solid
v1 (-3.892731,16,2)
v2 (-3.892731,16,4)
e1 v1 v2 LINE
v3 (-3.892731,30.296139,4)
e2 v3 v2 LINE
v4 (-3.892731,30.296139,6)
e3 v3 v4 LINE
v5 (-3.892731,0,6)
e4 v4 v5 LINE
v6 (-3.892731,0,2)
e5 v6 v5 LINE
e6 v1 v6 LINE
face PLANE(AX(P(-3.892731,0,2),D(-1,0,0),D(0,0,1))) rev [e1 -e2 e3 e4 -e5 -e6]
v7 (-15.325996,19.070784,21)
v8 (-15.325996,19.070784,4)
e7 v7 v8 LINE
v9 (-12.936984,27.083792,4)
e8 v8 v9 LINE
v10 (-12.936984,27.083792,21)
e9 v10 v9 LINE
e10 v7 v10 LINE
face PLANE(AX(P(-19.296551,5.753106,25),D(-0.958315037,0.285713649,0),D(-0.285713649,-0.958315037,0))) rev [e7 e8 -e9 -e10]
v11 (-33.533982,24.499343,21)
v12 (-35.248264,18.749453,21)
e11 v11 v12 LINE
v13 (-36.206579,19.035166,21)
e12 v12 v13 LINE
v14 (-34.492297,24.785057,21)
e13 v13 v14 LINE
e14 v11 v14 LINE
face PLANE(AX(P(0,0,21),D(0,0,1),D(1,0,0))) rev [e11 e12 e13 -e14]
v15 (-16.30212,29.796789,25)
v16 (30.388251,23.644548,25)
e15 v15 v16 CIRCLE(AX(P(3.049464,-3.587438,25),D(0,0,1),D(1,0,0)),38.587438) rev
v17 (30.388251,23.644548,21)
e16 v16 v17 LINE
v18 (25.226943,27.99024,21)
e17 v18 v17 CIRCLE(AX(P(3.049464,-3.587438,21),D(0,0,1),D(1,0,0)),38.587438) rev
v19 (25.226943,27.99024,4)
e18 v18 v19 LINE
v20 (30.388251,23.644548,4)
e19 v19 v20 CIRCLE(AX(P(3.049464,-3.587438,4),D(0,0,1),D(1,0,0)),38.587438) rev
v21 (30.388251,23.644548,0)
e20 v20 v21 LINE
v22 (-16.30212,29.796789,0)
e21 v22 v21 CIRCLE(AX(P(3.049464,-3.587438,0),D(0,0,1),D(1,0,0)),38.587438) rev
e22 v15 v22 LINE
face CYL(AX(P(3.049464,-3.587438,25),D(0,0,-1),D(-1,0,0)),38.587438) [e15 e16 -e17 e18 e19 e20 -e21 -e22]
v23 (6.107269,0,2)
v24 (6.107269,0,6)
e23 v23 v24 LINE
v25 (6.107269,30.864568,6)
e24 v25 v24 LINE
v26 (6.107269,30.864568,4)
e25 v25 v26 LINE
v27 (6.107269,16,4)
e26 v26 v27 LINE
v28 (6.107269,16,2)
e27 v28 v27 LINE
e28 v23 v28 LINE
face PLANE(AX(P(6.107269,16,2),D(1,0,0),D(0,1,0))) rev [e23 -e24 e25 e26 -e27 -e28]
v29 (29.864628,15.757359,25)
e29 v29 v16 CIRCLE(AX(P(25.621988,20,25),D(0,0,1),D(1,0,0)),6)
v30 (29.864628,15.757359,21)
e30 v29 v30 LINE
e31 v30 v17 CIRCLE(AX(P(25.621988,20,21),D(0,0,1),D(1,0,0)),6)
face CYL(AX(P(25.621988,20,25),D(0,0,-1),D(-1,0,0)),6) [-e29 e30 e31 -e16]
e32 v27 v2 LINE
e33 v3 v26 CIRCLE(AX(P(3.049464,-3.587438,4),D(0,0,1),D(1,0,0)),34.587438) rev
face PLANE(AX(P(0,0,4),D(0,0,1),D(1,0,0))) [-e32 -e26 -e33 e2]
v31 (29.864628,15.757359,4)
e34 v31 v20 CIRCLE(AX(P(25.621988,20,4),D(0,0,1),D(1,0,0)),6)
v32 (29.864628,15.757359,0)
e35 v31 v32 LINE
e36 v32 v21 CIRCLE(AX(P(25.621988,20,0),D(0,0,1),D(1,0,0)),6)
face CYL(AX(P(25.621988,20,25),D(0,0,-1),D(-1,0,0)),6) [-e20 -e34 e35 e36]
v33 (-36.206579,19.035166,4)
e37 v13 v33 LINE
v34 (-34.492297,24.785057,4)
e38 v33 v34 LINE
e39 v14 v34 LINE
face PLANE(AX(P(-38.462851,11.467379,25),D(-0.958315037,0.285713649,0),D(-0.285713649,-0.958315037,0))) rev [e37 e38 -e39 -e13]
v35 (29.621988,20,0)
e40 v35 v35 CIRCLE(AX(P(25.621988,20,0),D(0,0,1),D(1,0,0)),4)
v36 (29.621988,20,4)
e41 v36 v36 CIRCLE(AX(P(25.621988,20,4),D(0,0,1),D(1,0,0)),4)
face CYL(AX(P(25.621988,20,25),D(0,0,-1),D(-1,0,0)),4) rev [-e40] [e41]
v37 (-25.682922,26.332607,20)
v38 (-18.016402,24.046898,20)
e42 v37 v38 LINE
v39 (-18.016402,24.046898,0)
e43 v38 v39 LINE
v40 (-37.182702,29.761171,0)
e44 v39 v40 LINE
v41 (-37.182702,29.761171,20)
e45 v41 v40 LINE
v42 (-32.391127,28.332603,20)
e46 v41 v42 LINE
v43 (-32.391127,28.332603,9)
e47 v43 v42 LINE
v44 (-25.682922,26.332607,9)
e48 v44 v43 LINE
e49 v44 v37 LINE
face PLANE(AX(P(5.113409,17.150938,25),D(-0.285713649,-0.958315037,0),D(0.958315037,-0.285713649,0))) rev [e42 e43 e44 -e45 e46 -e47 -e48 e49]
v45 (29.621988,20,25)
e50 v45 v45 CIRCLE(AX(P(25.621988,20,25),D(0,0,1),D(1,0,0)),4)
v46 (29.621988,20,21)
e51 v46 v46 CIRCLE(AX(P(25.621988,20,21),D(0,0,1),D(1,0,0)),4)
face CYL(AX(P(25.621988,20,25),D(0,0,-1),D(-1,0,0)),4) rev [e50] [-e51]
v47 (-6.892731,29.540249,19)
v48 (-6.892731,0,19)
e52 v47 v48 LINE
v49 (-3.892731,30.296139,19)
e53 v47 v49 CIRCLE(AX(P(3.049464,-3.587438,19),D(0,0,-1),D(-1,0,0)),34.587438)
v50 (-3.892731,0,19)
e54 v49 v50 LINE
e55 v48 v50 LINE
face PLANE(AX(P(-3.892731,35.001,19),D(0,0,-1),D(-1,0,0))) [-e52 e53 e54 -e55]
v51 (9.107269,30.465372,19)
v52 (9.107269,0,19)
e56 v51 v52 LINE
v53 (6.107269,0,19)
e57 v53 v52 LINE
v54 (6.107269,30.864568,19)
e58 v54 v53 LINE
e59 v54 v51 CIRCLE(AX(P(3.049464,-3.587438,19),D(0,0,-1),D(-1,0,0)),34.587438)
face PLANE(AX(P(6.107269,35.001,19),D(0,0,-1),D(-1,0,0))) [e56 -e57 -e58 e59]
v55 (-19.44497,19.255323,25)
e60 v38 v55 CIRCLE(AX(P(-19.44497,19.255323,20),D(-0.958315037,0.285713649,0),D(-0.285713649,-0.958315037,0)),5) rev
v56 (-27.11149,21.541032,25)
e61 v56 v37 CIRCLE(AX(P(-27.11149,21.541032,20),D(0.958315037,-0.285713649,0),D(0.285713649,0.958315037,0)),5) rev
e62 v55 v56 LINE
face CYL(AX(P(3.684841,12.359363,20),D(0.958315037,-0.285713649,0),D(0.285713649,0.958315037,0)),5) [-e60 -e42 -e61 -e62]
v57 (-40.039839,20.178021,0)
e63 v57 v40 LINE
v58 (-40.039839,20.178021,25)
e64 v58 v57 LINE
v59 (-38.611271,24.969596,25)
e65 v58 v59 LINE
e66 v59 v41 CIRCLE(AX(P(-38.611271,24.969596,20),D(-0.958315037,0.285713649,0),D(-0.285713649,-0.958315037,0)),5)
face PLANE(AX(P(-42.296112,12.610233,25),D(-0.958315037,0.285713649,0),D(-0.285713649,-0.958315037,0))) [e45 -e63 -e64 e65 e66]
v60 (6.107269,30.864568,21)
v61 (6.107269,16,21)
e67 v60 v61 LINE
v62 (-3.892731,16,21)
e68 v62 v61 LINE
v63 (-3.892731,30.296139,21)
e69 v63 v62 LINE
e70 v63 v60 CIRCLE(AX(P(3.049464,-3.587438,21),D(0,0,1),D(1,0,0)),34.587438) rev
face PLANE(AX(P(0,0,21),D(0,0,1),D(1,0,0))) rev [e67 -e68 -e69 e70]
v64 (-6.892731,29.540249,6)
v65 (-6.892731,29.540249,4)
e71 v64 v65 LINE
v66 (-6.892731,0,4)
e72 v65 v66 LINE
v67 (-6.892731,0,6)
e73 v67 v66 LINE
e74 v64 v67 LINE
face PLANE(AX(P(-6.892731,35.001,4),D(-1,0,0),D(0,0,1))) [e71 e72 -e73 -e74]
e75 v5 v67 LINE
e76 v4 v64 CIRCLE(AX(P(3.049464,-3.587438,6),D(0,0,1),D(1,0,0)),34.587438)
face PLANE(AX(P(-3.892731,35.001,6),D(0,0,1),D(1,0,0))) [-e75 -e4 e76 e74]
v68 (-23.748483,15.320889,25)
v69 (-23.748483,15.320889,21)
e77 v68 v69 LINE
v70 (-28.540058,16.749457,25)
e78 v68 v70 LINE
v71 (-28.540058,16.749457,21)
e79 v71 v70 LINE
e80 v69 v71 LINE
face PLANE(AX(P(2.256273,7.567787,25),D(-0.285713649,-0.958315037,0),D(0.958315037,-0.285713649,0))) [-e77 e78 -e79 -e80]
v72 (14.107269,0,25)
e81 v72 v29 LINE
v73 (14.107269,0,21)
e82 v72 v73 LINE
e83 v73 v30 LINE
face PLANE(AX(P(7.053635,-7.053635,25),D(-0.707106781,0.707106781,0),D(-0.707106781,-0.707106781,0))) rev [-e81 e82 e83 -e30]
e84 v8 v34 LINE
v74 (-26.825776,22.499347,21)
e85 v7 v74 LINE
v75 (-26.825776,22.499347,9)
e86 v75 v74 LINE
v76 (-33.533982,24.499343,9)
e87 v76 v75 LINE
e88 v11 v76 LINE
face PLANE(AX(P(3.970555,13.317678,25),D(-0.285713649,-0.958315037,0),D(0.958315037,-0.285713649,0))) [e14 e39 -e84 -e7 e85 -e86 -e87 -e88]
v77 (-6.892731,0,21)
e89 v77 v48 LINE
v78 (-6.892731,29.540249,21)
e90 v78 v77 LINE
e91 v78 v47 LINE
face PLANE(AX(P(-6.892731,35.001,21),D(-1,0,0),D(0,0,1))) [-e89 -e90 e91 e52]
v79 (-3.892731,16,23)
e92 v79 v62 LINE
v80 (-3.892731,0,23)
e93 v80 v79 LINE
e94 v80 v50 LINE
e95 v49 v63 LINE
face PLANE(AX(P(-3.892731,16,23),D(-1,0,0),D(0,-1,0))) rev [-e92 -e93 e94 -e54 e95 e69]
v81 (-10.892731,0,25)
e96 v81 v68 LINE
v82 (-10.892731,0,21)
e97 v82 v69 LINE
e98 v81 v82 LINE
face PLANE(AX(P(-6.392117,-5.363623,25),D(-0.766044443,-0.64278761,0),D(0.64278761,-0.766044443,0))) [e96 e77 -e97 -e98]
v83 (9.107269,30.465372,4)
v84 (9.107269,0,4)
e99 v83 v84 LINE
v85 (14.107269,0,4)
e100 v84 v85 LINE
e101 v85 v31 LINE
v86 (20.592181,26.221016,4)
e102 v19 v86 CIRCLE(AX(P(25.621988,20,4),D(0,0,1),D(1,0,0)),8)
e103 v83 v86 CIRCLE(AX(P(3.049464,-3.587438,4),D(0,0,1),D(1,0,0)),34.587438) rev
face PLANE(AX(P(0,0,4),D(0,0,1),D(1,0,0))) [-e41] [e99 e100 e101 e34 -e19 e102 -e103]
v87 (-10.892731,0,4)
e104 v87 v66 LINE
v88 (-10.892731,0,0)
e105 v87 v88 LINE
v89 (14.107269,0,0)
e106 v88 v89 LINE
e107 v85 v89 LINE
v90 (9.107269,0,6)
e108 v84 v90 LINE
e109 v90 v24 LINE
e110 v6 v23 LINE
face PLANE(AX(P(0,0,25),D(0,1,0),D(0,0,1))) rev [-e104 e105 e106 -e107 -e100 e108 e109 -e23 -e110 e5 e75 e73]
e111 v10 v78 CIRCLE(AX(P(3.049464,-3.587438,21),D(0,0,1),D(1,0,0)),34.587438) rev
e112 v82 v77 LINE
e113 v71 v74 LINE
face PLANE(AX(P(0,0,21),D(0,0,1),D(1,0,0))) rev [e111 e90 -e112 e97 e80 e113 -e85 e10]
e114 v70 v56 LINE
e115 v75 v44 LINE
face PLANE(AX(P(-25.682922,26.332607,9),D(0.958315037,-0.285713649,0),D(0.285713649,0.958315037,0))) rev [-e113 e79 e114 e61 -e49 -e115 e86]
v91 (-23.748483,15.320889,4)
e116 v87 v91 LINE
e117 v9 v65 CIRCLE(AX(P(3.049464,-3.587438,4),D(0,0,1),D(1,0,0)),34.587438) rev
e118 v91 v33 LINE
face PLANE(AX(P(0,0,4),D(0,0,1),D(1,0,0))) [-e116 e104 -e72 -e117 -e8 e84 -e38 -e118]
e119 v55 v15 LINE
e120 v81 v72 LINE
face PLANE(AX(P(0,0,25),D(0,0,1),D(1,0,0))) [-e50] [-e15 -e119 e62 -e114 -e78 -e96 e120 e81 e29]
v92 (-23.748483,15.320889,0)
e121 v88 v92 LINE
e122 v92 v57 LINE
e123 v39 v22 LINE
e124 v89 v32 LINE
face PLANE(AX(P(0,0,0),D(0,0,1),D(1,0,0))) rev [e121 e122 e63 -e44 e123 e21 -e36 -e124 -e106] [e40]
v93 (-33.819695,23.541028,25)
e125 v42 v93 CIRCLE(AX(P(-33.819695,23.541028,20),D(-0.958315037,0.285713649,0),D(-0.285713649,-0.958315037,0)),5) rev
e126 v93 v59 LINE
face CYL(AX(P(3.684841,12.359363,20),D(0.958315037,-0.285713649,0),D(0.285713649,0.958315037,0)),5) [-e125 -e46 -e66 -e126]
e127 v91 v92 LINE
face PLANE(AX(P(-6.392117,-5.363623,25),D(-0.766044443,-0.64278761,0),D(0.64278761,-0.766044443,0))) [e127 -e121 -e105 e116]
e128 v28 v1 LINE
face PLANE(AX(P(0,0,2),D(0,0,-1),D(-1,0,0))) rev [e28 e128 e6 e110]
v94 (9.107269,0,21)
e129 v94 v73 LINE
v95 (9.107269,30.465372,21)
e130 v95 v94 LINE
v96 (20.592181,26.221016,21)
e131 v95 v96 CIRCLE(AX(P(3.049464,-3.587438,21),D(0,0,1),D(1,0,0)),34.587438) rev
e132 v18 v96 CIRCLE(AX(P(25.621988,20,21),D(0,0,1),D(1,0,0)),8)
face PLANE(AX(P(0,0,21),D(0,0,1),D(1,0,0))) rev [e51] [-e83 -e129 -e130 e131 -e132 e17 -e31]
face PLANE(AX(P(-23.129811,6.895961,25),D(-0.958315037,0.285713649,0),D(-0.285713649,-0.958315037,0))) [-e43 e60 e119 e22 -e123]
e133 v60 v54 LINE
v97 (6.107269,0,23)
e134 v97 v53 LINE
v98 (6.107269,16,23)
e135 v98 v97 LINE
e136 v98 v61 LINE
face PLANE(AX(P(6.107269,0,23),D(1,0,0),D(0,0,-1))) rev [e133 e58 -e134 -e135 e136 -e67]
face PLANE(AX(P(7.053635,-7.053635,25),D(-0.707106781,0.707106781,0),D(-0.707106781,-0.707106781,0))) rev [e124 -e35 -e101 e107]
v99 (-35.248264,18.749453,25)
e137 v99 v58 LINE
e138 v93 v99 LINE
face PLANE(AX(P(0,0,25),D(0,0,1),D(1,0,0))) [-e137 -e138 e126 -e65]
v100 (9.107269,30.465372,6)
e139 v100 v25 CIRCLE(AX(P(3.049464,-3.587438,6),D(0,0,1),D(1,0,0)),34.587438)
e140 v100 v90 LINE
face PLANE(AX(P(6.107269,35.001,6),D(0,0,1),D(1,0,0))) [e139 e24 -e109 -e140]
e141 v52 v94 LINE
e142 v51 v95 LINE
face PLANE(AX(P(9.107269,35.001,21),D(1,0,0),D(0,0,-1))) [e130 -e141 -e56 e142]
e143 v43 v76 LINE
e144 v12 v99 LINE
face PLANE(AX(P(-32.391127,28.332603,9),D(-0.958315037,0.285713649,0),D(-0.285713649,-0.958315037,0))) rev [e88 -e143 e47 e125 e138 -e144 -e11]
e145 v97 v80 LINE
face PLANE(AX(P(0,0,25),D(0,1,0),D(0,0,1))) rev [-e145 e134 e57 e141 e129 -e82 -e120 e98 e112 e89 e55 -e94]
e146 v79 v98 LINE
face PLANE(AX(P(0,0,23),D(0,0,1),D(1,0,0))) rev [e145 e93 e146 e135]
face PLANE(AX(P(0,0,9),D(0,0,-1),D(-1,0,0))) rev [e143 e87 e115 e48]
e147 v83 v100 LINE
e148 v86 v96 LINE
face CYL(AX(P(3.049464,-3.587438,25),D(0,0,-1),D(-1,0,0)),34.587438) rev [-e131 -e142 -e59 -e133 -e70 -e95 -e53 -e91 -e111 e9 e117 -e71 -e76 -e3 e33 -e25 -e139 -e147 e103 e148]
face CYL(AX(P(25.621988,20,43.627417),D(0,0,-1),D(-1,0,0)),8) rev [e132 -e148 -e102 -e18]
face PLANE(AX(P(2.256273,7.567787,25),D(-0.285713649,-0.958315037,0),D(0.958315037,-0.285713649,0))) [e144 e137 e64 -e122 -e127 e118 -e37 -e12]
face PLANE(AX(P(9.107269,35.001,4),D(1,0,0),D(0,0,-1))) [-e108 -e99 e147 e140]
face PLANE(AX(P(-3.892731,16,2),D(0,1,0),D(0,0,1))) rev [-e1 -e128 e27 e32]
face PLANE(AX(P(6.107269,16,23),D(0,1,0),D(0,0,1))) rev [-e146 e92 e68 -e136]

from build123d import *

# Parameters (mm, degrees)
SKETCH2_R                = 4
BOSS_EXTRUDE1_DEPTH      = 25
SHELL1_START             = 4
SHELL1_DEPTH             = 17
SKETCH4_W                = 10
SKETCH4_H                = 16
CUT_EXTRUDE1_DEPTH       = 2
SKETCH5_W                = 10
SKETCH5_H                = 16
CUT_EXTRUDE2_DEPTH       = 2
BOSS_EXTRUDE2_REACH      = 60.764
BOSS_EXTRUDE2_END_RADIUS = 34.587437562
SKETCH12_W               = 3
SKETCH12_H               = 2
CUT_EXTRUDE3_DEPTH       = 16
FILLET1_R                = 5
SKETCH14_R               = 8
CUT_EXTRUDE4_DEPTH       = 17


# Read off the part's stored shape, not the designer's step: Shell1
with BuildPart() as part:
    # Sketch2 → Boss-Extrude1 (new body)
    with BuildSketch(Plane.XY):
        with BuildLine():
            ThreePointArc((-16.302119642, 29.796788513), (8.090433332, 34.669313021), (30.38825142, 23.64454798))
            ThreePointArc((30.38825142, 23.64454798), (31.608808708, 19.602540573), (29.864628369, 15.757359313))
            Line((29.864628369, 15.757359313), (14.107269056, 0))
            Line((14.107269056, 0), (-10.892730944, 0))
            Line((-10.892730944, 0), (-23.748483138, 15.320888862))
            Line((-23.748483138, 15.320888862), (-40.039838772, 20.178020896))
            Line((-40.039838772, 20.178020896), (-37.182702282, 29.761171269))
            Line((-37.182702282, 29.761171269), (-18.016401536, 24.046898289))
            Line((-18.016401536, 24.046898289), (-16.302119642, 29.796788513))
        make_face()
        with Locations((25.621987682, 20)):
            Circle(SKETCH2_R, mode=Mode.SUBTRACT)
    extrude(amount=BOSS_EXTRUDE1_DEPTH)

    # Shell1 outline → Shell1 (cut)
    with BuildSketch(Plane.XY.offset(SHELL1_START)):
        with BuildLine():
            ThreePointArc((20.592180868, 26.221016269), (3.939176513, 30.988554812), (-12.936984293, 27.083791792))
            Line((-12.936984293, 27.083791792), (-15.325995982, 19.070783543))
            Line((-15.325995982, 19.070783543), (-34.492296729, 24.785056524))
            Line((-34.492296729, 24.785056524), (-36.206578623, 19.0351663))
            Line((-36.206578623, 19.0351663), (-23.748483138, 15.320888862))
            Line((-23.748483138, 15.320888862), (-10.892730944, 0))
            Line((-10.892730944, 0), (14.107269056, 0))
            Line((14.107269056, 0), (26.122970982, 12.015701926))
            ThreePointArc((26.122970982, 12.015701926), (18.16710341, 17.097466537), (20.592180868, 26.221016269))
        make_face()
    extrude(amount=SHELL1_DEPTH, mode=Mode.SUBTRACT)

    # Sketch4 → Cut-Extrude1 (cut)
    with BuildSketch(Plane.XY.offset(4)):
        with Locations((1.107269056, 8)):
            Rectangle(SKETCH4_W, SKETCH4_H)
    extrude(amount=-CUT_EXTRUDE1_DEPTH, mode=Mode.SUBTRACT)

    # Sketch5 → Cut-Extrude2 (cut)
    with BuildSketch(Plane(origin=(0, 0, 21), x_dir=(-1, 0, 0), z_dir=(0, 0, -1))):
        with Locations((-1.107269056, 8)):
            Rectangle(SKETCH5_W, SKETCH5_H)
    extrude(amount=-CUT_EXTRUDE2_DEPTH, mode=Mode.SUBTRACT)

    # Boss-Extrude2: up to this cylinder (the profile starts inside it)
    boss_extrude2_end = Plane(origin=(3.049463937, -3.587437562, 12.5), z_dir=(0, 0, -1)) * Cylinder(BOSS_EXTRUDE2_END_RADIUS, 206.702875123, mode=Mode.PRIVATE)
    # Sketch12 → Boss-Extrude2 (add, up to the surface)
    with BuildSketch(Plane.XZ, mode=Mode.PRIVATE) as boss_extrude2_sk1:
        with Locations((-5.392730944, 20)):
            Rectangle(SKETCH12_W, SKETCH12_H)
    boss_extrude2_tool1 = extrude(boss_extrude2_sk1.sketch, amount=-BOSS_EXTRUDE2_REACH, mode=Mode.PRIVATE) & boss_extrude2_end
    add(boss_extrude2_tool1.solids().sort_by_distance((-5.392731, 0, 20))[0])
    # Sketch12 → Boss-Extrude2 (add, up to the surface)
    with BuildSketch(Plane.XZ, mode=Mode.PRIVATE) as boss_extrude2_sk2:
        with Locations((7.607269056, 20)):
            Rectangle(SKETCH12_W, SKETCH12_H)
    boss_extrude2_tool2 = extrude(boss_extrude2_sk2.sketch, amount=-BOSS_EXTRUDE2_REACH, mode=Mode.PRIVATE) & boss_extrude2_end
    add(boss_extrude2_tool2.solids().sort_by_distance((7.607269, 0, 20))[0])
    # Sketch12 → Boss-Extrude2 (add, up to the surface)
    with BuildSketch(Plane.XZ, mode=Mode.PRIVATE) as boss_extrude2_sk3:
        with Locations((-5.392730944, 5)):
            Rectangle(SKETCH12_W, SKETCH12_H)
    boss_extrude2_tool3 = extrude(boss_extrude2_sk3.sketch, amount=-BOSS_EXTRUDE2_REACH, mode=Mode.PRIVATE) & boss_extrude2_end
    add(boss_extrude2_tool3.solids().sort_by_distance((-5.392731, 0, 5))[0])
    # Sketch12 → Boss-Extrude2 (add, up to the surface)
    with BuildSketch(Plane.XZ, mode=Mode.PRIVATE) as boss_extrude2_sk4:
        with Locations((7.607269056, 5)):
            Rectangle(SKETCH12_W, SKETCH12_H)
    boss_extrude2_tool4 = extrude(boss_extrude2_sk4.sketch, amount=-BOSS_EXTRUDE2_REACH, mode=Mode.PRIVATE) & boss_extrude2_end
    add(boss_extrude2_tool4.solids().sort_by_distance((7.607269, 0, 5))[0])

    # Sketch13 → Cut-Extrude3 (cut)
    with BuildSketch(Plane.XY.offset(25)):
        Polygon((-32.391127096, 28.332603024), (-35.248263586, 18.749452651), (-28.540058324, 16.749457107), (-25.682921834, 26.332607481), align=None)
    extrude(amount=-CUT_EXTRUDE3_DEPTH, mode=Mode.SUBTRACT)

    # Fillet1
    fillet1_edges = [part.edges().sort_by_distance(p)[0] for p in [
        (-34.786914689, 29.046887146, 25),
        (-21.849661685, 25.189752885, 25),
    ]]
    fillet(fillet1_edges, radius=FILLET1_R)

    # Sketch14 → Cut-Extrude4 (cut)
    with BuildSketch(Plane.XY.offset(4)):
        with Locations((25.621987682, 20)):
            Circle(SKETCH14_R)
    extrude(amount=CUT_EXTRUDE4_DEPTH, mode=Mode.SUBTRACT)


solid = part.part
